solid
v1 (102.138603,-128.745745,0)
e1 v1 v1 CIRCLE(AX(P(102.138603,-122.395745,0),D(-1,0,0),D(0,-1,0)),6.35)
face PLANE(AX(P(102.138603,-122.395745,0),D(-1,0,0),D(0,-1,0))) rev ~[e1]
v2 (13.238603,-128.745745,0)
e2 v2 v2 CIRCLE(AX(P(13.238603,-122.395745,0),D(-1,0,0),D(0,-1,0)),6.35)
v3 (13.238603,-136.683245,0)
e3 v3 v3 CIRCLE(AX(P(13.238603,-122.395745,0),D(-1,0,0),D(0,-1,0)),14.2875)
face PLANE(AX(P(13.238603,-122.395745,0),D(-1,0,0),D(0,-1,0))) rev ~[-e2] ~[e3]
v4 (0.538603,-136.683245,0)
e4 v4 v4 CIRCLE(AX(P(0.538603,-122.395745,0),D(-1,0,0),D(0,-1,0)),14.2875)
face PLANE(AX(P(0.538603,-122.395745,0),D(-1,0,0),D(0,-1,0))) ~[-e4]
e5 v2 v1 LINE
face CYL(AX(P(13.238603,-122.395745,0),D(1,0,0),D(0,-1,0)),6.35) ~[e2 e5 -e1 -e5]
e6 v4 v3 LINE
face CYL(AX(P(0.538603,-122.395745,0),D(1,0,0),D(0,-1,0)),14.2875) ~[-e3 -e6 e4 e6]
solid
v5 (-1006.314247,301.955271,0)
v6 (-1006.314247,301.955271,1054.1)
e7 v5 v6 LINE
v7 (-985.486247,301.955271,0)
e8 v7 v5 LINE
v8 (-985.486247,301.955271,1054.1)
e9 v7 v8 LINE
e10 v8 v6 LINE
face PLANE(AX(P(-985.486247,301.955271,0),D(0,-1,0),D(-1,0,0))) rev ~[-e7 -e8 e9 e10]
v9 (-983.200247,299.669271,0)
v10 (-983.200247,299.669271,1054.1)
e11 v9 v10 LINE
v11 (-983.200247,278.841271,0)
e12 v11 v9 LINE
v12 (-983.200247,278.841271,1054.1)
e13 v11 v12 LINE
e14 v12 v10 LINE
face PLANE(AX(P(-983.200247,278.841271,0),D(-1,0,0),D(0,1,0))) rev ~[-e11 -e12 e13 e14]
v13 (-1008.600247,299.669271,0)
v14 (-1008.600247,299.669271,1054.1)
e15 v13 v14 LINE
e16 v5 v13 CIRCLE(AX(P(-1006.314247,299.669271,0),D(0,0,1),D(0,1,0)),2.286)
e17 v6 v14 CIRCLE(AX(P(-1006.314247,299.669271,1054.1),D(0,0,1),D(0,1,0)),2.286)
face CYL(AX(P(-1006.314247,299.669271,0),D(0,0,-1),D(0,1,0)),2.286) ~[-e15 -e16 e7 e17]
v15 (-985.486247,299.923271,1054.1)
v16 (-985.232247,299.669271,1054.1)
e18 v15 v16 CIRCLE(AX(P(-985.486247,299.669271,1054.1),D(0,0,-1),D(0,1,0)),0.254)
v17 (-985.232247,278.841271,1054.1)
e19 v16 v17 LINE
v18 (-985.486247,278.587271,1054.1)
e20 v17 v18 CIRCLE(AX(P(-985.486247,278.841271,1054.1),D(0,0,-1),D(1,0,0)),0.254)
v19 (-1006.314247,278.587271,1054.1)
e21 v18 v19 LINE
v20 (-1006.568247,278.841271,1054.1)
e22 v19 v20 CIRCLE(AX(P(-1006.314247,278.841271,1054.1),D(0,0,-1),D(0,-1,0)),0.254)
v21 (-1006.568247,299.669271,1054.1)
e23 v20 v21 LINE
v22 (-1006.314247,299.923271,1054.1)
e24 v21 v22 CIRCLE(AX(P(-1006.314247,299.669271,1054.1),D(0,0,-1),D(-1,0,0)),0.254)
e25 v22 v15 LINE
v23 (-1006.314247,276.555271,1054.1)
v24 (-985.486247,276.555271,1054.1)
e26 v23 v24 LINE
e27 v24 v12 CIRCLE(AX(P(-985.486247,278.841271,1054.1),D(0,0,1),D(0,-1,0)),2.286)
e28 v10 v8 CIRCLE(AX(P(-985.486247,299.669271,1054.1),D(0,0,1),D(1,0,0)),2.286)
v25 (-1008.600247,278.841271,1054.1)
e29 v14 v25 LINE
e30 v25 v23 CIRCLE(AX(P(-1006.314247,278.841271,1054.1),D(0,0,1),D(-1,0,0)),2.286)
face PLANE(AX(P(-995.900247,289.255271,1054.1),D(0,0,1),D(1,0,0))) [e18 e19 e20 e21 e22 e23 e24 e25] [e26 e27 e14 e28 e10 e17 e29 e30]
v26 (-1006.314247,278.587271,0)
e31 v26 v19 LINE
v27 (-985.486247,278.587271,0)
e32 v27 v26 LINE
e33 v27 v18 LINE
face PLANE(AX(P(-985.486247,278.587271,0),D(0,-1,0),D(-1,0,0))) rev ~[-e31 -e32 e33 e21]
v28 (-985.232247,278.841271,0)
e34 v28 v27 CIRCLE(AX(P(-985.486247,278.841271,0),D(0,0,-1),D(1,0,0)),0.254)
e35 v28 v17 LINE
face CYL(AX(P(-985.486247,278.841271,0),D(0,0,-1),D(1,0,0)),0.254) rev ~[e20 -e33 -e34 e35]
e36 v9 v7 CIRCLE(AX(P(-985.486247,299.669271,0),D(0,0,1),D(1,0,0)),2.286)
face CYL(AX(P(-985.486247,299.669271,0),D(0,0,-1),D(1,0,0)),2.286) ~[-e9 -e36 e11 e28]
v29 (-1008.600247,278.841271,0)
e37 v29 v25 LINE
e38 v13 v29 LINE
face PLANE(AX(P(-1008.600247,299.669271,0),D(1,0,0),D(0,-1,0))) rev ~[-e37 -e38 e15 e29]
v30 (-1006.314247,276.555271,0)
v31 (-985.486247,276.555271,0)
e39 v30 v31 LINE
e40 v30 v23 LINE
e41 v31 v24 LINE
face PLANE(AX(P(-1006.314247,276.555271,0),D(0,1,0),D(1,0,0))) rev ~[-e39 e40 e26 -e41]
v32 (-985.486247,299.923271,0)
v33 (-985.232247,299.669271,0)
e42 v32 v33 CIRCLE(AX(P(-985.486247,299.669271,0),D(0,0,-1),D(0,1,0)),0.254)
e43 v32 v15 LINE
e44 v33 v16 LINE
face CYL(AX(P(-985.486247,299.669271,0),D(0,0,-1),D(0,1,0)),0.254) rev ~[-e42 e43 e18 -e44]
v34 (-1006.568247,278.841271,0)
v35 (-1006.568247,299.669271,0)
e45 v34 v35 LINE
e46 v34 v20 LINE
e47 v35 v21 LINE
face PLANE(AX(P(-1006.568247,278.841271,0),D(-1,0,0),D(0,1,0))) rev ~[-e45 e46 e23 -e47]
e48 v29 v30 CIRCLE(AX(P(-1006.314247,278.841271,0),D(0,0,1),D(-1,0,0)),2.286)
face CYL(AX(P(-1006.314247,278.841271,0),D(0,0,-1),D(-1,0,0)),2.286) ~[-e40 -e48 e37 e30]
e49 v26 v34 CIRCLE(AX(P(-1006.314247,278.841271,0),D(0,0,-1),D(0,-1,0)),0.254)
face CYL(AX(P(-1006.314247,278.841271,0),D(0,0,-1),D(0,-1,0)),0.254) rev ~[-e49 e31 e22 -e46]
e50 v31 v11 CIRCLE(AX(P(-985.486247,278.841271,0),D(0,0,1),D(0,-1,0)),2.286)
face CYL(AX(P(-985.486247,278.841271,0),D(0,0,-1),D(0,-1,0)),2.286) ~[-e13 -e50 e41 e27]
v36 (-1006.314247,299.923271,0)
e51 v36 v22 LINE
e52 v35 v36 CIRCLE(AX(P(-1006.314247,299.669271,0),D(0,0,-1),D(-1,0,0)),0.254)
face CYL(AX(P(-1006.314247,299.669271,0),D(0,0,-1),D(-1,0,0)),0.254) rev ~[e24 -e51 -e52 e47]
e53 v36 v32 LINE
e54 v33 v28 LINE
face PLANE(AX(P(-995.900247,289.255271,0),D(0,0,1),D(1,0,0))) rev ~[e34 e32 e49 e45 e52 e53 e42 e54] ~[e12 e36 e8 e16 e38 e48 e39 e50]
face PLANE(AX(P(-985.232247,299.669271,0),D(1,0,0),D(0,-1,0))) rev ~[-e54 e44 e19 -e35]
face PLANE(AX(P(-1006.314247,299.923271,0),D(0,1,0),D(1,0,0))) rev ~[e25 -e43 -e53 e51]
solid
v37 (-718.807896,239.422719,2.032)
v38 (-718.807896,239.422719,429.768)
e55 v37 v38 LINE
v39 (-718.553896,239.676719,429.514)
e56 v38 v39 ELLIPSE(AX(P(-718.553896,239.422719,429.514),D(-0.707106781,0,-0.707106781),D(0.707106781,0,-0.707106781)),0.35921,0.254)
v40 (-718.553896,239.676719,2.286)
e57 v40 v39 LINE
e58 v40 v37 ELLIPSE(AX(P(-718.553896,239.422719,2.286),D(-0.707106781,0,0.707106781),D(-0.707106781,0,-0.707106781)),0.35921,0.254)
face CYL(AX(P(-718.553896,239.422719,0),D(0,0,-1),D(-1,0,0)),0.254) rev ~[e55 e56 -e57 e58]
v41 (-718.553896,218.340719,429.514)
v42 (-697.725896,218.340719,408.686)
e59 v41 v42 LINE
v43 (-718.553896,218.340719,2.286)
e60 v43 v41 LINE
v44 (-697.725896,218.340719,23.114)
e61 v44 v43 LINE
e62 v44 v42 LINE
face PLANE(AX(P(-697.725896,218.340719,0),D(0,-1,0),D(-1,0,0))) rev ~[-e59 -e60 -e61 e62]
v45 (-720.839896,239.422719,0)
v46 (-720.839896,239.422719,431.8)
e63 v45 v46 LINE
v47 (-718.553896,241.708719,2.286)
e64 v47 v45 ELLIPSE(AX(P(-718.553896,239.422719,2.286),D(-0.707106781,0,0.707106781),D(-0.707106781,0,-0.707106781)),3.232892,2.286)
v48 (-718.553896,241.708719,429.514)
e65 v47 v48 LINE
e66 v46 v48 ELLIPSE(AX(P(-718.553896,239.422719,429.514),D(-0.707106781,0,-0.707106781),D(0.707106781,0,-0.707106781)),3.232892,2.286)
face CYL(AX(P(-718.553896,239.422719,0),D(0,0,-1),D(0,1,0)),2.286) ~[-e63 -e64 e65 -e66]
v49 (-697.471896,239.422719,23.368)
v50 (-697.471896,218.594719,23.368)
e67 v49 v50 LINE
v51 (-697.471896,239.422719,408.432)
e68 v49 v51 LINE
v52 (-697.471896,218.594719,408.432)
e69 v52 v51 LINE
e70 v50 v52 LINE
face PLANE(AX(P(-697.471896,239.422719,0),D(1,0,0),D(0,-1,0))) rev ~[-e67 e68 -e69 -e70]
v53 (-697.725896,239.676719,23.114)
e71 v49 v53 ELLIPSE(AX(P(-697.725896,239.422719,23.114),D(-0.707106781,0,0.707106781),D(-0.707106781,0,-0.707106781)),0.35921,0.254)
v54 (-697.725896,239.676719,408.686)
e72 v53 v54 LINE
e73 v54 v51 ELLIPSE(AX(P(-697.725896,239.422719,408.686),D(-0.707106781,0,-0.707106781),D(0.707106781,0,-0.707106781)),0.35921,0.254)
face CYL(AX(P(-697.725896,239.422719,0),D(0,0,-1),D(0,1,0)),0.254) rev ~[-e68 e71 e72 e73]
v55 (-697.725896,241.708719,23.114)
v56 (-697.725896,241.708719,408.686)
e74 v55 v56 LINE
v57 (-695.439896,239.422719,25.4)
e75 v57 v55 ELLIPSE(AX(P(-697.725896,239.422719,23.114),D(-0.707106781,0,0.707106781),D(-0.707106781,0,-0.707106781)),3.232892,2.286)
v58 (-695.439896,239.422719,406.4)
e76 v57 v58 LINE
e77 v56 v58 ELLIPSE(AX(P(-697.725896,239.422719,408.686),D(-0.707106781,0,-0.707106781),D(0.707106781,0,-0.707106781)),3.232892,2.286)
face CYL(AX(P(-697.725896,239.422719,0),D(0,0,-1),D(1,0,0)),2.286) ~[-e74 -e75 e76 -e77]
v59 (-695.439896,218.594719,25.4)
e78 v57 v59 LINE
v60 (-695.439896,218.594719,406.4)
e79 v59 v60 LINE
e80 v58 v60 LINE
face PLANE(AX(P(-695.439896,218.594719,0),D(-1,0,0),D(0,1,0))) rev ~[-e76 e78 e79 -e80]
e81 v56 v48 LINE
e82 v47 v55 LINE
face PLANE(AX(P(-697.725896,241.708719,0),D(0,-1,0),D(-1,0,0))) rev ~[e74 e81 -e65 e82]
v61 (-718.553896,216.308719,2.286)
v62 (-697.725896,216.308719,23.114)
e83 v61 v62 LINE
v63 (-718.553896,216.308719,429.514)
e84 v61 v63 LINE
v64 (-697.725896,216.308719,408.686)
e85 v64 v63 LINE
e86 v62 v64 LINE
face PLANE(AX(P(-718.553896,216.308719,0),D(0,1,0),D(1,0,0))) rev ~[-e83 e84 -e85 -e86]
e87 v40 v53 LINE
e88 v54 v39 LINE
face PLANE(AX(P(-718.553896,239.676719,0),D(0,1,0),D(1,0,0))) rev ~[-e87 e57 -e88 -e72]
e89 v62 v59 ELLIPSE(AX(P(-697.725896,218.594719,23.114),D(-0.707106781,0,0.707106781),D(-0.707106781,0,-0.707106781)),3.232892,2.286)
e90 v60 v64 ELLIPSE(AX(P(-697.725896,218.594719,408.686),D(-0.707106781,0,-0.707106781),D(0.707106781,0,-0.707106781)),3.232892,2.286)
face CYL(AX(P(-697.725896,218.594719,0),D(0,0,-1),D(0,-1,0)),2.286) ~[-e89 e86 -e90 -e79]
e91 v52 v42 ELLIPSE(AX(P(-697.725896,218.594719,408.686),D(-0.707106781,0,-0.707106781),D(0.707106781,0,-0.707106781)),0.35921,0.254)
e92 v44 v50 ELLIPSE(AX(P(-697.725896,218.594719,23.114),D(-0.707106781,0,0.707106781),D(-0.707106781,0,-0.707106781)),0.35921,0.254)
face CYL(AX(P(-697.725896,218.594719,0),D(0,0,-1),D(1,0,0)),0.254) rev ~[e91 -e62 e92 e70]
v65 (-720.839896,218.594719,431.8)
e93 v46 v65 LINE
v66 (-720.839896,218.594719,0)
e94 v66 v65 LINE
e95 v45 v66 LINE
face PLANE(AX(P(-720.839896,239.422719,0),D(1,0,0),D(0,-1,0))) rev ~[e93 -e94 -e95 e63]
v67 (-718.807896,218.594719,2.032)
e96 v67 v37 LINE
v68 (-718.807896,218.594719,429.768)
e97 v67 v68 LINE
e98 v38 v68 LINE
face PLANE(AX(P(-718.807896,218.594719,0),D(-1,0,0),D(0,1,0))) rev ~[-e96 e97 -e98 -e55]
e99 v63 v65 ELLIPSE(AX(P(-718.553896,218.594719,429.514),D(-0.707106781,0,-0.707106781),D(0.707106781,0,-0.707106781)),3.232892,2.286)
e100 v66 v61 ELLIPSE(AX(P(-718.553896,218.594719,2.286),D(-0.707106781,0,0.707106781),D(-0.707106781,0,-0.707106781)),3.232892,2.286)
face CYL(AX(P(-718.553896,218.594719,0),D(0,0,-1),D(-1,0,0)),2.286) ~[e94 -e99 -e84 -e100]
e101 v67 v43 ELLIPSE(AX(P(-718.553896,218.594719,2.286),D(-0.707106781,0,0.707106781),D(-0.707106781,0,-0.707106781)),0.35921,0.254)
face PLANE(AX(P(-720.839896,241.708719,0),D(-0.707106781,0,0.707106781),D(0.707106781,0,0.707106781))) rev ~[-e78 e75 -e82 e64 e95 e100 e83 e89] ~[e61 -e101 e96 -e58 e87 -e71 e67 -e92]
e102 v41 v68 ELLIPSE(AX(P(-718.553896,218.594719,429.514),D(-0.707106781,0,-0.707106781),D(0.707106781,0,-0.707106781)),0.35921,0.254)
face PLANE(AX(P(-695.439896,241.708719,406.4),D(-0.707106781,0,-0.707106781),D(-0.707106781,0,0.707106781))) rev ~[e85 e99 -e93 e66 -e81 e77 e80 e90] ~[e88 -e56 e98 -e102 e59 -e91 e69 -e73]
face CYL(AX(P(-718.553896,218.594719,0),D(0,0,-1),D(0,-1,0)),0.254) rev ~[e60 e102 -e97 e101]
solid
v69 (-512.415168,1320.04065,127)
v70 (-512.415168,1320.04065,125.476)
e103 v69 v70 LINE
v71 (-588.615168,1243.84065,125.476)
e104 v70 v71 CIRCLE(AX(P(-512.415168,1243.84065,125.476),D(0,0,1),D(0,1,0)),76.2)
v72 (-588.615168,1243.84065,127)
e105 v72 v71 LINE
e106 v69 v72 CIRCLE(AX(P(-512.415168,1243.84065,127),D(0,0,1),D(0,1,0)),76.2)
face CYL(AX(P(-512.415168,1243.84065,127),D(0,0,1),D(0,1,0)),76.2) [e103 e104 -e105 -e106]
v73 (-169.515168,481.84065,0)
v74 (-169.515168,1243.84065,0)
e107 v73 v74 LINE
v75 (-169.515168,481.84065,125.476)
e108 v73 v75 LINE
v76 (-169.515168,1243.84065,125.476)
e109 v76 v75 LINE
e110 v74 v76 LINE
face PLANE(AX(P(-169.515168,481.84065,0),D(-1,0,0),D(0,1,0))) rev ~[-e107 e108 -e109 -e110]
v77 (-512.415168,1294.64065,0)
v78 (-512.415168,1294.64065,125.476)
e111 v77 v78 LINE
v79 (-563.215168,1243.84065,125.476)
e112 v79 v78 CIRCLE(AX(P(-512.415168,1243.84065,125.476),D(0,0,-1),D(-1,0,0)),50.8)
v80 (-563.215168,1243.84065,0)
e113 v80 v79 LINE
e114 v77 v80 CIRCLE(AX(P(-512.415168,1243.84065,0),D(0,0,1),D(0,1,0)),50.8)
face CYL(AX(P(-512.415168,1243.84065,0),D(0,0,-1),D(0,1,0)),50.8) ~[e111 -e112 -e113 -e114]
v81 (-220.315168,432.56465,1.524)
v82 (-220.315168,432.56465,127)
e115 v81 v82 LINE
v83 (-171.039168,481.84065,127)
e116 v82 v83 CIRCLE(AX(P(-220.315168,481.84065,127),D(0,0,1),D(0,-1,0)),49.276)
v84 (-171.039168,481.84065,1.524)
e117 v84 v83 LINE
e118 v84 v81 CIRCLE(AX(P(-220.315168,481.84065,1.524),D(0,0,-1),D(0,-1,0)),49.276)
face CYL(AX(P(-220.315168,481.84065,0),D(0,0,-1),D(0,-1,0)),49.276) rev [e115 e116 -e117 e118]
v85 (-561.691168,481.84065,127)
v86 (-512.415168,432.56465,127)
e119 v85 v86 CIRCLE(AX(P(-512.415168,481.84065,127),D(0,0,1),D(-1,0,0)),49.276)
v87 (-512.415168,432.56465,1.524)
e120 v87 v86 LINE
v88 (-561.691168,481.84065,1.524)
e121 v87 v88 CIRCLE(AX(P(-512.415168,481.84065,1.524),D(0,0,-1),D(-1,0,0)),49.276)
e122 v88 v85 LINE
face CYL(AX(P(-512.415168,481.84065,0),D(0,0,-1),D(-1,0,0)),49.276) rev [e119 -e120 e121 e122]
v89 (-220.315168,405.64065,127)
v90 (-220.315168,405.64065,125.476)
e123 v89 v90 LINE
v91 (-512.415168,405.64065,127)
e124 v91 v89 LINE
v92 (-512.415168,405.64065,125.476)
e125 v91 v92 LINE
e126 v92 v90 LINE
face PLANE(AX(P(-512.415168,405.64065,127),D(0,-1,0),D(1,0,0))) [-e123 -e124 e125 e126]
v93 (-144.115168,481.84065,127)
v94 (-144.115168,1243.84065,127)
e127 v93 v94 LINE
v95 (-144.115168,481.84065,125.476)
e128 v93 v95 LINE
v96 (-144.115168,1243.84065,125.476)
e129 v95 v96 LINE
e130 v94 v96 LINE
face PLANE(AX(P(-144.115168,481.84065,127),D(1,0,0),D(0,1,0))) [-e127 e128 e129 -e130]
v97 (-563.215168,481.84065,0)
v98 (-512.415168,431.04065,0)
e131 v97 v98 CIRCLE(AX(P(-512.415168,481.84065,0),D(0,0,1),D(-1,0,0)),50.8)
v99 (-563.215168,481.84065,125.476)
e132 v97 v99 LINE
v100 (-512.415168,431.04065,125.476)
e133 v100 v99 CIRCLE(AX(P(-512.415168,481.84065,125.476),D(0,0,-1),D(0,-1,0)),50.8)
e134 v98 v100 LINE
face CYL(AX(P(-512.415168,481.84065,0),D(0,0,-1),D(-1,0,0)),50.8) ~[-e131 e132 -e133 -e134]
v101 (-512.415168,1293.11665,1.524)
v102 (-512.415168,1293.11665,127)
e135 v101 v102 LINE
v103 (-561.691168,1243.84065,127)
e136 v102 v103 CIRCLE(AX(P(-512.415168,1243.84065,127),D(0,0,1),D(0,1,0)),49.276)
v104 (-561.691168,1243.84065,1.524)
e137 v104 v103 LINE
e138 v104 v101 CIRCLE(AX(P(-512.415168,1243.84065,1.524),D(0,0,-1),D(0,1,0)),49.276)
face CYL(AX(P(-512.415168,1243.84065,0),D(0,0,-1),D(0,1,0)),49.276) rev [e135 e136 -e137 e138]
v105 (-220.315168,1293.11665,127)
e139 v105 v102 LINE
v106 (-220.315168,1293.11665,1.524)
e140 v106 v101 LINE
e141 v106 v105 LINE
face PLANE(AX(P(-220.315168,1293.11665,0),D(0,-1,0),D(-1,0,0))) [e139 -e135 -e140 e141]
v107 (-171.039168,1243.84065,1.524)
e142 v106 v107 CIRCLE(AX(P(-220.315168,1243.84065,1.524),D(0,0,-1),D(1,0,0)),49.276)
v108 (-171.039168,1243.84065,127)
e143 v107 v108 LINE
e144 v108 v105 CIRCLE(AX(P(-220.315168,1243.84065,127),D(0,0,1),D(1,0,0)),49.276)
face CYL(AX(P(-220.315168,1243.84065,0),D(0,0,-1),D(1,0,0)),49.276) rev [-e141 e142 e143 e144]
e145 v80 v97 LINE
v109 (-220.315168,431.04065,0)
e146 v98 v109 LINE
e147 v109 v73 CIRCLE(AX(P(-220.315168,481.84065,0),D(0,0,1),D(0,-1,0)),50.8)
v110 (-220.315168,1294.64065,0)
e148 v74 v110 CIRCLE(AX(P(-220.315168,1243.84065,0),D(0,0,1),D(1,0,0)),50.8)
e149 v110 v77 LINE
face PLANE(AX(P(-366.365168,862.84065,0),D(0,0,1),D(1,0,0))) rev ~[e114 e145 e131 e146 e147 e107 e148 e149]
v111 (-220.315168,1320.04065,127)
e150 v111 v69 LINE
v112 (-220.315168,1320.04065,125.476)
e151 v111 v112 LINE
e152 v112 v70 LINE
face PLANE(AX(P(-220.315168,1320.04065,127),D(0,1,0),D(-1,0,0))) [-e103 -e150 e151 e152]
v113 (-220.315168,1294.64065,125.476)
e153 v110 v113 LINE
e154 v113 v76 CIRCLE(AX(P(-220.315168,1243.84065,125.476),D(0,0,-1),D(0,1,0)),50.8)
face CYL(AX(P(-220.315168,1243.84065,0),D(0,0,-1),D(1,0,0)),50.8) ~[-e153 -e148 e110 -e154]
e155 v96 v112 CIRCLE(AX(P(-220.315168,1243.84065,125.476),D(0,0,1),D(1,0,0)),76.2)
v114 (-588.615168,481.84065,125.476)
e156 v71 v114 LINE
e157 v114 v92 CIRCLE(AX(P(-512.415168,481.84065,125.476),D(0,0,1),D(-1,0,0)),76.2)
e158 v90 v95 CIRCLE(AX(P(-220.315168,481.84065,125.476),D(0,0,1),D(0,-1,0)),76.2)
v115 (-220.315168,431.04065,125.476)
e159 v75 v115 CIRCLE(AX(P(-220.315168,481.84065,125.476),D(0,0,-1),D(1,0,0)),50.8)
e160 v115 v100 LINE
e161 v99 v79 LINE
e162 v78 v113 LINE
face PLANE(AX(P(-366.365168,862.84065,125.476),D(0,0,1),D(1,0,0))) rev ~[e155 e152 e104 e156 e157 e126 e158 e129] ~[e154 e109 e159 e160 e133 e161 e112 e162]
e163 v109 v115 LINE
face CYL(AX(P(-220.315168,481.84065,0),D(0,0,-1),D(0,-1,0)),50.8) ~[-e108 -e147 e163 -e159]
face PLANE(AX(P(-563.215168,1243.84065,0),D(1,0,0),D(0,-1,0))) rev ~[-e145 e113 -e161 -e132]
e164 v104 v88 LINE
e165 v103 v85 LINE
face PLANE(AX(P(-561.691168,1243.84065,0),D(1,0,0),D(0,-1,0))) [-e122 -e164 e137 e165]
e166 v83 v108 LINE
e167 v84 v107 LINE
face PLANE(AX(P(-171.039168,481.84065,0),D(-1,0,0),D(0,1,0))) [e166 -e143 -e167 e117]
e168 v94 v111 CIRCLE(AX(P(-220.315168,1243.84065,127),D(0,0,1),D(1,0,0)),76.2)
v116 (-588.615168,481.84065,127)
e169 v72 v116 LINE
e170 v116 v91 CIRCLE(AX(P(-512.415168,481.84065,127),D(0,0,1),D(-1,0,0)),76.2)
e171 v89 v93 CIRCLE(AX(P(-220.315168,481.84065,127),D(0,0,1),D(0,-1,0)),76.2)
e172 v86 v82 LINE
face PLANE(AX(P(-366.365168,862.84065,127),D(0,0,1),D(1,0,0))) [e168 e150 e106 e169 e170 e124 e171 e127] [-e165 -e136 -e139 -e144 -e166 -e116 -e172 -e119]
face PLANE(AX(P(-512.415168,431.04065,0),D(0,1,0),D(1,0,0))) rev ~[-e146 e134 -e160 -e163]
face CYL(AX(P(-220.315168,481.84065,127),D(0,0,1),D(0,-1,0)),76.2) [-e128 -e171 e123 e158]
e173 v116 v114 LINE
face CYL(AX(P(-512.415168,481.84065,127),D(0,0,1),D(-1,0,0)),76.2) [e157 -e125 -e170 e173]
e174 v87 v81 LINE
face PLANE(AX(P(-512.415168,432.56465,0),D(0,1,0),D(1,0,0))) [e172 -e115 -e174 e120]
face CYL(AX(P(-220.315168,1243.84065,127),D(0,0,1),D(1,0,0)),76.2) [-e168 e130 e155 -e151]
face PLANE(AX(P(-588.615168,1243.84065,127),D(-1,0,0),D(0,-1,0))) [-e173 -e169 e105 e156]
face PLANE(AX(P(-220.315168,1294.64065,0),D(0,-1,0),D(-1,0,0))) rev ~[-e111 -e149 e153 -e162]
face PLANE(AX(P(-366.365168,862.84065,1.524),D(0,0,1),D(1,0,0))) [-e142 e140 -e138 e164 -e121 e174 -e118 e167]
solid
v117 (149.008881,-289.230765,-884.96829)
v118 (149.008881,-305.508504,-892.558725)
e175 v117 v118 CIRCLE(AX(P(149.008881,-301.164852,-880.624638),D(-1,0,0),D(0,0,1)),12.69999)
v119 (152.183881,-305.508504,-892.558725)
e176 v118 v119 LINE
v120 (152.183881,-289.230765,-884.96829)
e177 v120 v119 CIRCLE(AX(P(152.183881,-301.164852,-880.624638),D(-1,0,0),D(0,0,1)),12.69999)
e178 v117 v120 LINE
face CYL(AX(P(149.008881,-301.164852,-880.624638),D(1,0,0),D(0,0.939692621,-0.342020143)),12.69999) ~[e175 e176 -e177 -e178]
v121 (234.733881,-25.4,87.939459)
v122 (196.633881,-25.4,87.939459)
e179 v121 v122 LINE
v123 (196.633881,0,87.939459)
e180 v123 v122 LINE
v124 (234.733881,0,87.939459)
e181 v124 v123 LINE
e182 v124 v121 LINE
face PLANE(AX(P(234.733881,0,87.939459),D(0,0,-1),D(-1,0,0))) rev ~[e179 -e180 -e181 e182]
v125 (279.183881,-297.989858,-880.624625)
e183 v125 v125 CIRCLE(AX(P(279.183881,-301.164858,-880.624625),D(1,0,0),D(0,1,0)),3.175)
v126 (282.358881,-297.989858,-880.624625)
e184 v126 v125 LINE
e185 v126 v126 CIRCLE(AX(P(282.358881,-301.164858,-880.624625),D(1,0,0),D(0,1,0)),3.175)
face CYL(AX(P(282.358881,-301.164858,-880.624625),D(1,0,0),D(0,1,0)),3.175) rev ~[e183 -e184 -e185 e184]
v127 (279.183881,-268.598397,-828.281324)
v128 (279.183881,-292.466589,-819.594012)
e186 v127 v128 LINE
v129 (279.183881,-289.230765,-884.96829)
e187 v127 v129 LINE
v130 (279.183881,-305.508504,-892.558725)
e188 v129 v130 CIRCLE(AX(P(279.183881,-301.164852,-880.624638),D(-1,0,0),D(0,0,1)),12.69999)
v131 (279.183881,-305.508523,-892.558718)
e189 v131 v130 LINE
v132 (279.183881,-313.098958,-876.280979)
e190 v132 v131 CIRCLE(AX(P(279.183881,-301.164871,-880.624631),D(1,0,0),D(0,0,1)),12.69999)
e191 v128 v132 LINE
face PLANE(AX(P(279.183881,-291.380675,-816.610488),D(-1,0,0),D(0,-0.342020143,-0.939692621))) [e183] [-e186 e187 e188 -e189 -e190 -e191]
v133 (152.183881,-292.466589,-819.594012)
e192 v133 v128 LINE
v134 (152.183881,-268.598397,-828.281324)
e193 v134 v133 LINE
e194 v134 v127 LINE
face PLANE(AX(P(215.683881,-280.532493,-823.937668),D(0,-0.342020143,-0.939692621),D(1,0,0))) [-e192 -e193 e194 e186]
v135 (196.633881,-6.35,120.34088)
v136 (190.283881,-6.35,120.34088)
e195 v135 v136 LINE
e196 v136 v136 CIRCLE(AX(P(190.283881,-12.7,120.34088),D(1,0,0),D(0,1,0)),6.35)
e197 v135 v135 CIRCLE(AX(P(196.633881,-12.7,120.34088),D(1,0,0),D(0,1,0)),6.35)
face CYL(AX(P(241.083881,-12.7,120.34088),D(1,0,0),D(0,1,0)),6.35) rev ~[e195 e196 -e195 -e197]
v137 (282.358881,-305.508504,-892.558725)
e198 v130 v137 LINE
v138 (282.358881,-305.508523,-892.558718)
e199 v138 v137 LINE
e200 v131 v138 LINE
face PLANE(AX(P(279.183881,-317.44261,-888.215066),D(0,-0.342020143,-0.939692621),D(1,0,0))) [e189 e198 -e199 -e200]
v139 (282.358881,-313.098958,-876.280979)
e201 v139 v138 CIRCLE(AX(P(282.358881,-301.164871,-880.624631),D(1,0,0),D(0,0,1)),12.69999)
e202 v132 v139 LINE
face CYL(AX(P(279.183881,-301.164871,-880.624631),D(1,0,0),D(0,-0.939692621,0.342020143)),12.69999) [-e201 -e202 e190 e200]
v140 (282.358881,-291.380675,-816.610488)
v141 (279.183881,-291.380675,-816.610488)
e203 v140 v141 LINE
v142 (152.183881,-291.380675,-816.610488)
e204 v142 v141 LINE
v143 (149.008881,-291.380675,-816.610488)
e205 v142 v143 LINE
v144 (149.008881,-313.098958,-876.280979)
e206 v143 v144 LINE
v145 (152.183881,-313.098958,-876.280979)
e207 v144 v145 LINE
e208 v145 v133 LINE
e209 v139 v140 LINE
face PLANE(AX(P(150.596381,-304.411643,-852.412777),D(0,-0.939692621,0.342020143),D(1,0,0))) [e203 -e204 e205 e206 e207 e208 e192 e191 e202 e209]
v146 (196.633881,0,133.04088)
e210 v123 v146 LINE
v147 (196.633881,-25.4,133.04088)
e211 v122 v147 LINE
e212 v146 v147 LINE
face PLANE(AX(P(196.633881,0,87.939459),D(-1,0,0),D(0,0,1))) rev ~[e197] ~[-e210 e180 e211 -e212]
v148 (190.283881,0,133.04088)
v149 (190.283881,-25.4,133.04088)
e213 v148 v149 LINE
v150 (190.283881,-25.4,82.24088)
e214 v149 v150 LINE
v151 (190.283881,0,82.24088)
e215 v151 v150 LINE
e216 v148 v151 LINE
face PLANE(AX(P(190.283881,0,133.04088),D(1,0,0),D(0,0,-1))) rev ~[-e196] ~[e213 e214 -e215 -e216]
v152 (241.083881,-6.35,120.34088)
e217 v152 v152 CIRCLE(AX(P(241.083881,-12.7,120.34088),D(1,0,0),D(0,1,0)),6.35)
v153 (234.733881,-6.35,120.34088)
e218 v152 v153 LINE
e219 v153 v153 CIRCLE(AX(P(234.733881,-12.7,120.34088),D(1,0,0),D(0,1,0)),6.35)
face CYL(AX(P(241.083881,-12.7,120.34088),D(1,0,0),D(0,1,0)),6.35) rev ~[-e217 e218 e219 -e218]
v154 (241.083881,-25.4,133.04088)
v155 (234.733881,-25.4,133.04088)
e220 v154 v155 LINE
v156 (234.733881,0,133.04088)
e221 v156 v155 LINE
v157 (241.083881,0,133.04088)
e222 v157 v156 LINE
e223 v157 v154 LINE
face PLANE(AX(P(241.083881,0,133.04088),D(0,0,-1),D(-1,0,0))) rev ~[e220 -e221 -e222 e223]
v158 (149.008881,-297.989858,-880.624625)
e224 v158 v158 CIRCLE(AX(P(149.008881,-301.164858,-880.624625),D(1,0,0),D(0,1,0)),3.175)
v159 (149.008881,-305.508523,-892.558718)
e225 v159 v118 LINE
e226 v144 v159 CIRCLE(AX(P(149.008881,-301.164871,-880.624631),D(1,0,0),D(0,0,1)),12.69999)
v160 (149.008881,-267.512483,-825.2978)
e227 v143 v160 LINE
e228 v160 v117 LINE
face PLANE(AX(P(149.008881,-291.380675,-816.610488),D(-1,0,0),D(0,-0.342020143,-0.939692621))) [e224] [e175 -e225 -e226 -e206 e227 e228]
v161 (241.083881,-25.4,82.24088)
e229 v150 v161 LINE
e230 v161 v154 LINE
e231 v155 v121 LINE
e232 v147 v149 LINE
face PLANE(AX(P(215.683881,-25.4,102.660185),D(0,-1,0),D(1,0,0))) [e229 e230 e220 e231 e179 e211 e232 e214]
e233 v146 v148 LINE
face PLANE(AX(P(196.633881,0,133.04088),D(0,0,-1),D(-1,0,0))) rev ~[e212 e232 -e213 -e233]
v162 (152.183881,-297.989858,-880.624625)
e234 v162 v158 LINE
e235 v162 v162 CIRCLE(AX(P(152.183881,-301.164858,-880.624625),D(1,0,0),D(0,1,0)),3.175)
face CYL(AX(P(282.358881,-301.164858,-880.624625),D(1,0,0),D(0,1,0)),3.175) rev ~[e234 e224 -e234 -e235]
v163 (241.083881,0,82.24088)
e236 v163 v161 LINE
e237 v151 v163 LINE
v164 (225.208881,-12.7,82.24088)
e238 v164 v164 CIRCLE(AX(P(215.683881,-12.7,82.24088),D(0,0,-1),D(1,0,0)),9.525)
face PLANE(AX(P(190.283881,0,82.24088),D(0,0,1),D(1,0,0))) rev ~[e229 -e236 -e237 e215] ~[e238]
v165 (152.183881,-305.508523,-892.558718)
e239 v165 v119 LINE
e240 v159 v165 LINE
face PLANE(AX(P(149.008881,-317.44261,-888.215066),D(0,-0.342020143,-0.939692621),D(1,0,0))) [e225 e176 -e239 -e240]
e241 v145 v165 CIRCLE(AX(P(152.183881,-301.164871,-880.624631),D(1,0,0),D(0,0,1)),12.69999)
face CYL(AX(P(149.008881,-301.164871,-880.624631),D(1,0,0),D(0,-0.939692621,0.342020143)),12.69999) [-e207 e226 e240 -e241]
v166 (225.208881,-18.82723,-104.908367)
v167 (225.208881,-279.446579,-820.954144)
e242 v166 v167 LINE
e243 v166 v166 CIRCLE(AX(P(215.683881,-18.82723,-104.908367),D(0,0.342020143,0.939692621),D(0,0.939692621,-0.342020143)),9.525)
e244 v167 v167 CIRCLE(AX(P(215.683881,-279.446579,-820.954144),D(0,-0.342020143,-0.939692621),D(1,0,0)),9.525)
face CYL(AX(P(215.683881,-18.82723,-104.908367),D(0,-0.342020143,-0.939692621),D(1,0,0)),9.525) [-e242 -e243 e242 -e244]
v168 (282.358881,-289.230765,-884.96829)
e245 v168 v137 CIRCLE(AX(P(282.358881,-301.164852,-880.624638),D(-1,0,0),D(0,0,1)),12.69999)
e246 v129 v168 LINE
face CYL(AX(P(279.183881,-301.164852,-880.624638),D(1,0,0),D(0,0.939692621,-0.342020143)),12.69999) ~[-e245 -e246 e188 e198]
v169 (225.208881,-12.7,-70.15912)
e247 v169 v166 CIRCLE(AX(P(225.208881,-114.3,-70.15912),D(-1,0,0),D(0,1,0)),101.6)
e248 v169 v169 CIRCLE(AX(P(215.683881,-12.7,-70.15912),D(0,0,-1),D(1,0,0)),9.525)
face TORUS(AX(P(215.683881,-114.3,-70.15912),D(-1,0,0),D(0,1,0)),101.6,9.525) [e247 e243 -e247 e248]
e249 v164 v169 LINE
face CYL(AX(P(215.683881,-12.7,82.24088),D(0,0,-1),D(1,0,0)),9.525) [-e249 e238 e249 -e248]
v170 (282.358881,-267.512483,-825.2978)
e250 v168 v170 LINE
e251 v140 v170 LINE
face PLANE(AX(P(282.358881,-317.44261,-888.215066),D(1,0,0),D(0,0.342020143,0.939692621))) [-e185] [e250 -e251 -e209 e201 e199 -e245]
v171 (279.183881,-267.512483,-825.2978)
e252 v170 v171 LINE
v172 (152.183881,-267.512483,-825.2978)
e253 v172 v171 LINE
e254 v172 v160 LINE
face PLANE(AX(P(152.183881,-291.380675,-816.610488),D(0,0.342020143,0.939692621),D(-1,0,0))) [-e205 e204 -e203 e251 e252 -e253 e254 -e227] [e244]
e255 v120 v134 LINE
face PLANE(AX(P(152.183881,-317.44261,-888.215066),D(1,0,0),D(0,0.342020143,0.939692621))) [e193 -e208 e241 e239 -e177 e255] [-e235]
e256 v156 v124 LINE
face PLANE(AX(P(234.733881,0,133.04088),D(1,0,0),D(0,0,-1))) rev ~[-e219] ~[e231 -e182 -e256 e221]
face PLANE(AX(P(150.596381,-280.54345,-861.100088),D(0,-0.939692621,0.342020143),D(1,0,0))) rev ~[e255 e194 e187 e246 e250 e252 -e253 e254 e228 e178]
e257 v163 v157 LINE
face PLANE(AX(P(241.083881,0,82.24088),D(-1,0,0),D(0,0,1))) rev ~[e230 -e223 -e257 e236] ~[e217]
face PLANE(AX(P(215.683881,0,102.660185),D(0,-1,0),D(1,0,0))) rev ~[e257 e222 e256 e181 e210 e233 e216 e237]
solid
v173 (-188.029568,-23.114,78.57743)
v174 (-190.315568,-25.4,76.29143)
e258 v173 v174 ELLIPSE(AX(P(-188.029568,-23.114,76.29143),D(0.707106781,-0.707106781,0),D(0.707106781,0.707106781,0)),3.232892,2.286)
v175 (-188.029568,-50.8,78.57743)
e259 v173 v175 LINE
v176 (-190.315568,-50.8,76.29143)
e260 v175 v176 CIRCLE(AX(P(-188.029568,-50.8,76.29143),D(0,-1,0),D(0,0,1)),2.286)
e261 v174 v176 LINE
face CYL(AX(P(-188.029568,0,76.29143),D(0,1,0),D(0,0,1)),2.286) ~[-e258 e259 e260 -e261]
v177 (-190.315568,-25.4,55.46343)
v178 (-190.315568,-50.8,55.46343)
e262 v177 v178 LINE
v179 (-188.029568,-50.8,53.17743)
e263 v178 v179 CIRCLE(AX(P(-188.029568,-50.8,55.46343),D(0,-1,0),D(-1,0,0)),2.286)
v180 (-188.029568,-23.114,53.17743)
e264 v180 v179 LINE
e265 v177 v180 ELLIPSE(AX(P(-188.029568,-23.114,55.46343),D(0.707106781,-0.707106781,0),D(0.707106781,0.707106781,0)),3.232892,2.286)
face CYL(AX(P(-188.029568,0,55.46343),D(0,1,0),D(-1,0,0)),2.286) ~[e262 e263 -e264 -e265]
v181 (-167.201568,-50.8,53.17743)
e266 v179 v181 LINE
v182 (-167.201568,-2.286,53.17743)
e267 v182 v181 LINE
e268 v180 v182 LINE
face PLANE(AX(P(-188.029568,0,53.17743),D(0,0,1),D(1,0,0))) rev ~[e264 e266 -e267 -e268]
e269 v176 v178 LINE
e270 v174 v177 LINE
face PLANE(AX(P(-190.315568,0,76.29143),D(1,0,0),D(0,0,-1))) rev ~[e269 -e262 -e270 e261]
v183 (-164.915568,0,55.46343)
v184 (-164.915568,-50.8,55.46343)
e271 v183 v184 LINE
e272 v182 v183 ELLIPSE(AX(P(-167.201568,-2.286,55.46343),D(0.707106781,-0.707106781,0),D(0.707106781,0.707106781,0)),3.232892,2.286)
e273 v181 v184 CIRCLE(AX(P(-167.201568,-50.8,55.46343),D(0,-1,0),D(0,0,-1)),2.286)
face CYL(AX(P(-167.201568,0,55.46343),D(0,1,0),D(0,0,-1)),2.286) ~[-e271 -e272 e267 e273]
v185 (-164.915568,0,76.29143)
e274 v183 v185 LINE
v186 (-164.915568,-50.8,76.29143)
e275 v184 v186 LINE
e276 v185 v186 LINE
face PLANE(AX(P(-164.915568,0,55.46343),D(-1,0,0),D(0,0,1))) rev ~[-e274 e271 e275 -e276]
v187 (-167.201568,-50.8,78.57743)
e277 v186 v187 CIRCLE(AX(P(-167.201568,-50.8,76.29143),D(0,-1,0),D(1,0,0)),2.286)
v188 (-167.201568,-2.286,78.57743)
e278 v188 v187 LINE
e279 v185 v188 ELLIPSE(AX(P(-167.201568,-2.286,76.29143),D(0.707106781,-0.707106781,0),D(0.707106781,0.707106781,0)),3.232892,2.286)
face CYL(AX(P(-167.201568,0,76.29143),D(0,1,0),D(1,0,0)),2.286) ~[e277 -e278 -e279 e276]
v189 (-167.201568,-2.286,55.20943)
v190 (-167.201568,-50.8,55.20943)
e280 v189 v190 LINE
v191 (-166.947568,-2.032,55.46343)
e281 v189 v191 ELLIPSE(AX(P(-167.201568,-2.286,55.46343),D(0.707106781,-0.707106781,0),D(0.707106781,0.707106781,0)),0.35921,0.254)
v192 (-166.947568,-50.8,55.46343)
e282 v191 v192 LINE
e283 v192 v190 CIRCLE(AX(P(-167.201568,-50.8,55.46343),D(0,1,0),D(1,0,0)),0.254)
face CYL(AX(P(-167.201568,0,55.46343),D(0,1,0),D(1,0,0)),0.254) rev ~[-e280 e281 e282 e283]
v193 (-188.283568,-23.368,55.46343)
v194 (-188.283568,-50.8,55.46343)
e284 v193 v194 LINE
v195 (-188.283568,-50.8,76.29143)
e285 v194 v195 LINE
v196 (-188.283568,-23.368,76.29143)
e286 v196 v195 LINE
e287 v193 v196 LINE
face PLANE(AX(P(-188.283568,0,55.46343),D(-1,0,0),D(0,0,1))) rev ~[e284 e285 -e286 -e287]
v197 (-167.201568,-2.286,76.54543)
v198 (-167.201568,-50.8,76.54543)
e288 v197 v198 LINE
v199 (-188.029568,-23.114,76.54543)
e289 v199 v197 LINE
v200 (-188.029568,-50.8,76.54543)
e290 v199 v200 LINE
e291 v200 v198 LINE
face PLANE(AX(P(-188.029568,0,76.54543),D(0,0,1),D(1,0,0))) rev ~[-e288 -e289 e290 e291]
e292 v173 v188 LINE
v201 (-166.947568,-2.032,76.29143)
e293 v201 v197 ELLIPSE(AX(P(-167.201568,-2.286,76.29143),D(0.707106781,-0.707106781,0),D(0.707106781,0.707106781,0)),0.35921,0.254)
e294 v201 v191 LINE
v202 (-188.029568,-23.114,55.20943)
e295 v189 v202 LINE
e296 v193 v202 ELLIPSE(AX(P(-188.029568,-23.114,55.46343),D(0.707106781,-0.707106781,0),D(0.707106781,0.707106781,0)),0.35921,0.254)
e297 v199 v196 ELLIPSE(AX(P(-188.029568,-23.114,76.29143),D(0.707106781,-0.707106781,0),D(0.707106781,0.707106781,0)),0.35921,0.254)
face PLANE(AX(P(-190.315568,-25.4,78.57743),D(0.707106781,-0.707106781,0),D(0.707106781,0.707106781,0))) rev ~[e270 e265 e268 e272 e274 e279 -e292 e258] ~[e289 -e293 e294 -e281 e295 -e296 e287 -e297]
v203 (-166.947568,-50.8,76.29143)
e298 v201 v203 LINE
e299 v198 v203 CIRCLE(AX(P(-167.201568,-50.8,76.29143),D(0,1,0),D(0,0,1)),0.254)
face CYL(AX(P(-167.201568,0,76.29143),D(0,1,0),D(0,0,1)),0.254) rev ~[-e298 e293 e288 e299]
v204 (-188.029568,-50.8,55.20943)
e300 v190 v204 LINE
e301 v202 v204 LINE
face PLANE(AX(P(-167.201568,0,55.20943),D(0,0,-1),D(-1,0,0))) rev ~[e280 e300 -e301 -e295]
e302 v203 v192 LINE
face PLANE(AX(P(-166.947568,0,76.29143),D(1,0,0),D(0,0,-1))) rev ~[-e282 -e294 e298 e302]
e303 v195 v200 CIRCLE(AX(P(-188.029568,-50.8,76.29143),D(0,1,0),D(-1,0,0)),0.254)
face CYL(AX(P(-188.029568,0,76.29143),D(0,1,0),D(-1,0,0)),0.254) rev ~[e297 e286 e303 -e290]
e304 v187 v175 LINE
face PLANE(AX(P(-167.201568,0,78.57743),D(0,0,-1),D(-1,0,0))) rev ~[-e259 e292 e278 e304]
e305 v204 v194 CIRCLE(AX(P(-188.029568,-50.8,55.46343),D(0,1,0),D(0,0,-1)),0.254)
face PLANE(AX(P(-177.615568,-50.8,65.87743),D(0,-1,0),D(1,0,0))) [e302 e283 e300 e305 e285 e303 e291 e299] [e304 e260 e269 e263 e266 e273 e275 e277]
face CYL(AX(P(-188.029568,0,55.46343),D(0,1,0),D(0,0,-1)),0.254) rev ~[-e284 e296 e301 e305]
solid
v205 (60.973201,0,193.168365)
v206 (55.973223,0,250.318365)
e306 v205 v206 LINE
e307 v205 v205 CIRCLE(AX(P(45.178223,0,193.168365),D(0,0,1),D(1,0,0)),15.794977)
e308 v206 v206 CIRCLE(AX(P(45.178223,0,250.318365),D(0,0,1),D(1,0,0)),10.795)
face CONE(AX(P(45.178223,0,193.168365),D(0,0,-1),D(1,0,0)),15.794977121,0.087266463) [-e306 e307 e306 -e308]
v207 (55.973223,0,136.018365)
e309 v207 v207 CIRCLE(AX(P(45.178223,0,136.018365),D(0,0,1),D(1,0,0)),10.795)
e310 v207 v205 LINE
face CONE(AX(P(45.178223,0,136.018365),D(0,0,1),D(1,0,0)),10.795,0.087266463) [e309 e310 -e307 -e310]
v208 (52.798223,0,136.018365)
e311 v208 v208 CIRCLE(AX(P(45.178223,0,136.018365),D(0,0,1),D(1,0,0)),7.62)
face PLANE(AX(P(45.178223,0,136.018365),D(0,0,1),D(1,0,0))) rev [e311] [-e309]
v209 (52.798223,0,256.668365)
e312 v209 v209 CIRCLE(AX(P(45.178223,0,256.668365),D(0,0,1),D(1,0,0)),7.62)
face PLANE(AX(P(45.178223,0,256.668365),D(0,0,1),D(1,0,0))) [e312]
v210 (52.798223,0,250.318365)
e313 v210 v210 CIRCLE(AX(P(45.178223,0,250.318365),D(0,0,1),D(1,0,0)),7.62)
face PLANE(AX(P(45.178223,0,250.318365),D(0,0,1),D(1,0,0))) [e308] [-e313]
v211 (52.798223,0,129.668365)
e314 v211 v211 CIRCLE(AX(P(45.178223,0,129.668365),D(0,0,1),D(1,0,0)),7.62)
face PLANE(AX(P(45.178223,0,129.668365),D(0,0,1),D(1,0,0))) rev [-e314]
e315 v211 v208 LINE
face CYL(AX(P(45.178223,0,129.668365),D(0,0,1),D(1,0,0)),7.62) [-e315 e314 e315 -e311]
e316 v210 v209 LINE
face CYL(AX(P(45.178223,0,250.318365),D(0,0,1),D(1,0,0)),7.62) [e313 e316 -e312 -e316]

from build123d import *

# Parameters (mm, degrees)
F1_DEPTH  = 1054.1
F3_DEPTH  = 431.8
F5_DEPTH  = 50.8
F7_DEPTH  = 25.4
F9_DEPTH  = 25.4
F13_DEPTH = 127
F14_T     = -1.524
F16_DEPTH = 1.524
F18_DEPTH = 25.4
F19_R     = 9.525
F23_R     = 6.35
F24_DEPTH = 50.8
F25_W     = 127
F25_H     = 25.4
F25_R     = 9.525
F26_DEPTH = 3.175
F28_DEPTH = 25.4
F29_R     = 3.175
F30_DEPTH = 133.35
F31_R     = 12.69999


# Not quite as in the source:
# - a fillet or chamfer is up to 0.001 mm smaller than in the source, because OpenCascade refuses the exact size


with BuildPart() as f1:
    # F0 (on Top) → F1 (new body)
    with BuildSketch(Plane.XY):
        with BuildLine():
            ThreePointArc((-1008.6002467976, 278.8412709408), (-1007.9306928994, 277.224824839), (-1006.3142467976, 276.5552709408))
            Line((-1006.3142467976, 276.5552709408), (-985.4862467976, 276.5552709408))
            ThreePointArc((-985.4862467976, 276.5552709408), (-983.8698006958, 277.224824839), (-983.2002467976, 278.8412709408))
            Line((-983.2002467976, 278.8412709408), (-983.2002467976, 299.6692709408))
            ThreePointArc((-983.2002467976, 299.6692709408), (-983.8698006958, 301.2857170426), (-985.4862467976, 301.9552709408))
            Line((-985.4862467976, 301.9552709408), (-1006.3142467976, 301.9552709408))
            ThreePointArc((-1006.3142467976, 301.9552709408), (-1007.9306928994, 301.2857170426), (-1008.6002467976, 299.6692709408))
            Line((-1008.6002467976, 299.6692709408), (-1008.6002467976, 278.8412709408))
        make_face()
        with BuildLine():
            ThreePointArc((-1006.5682467976, 299.6692709408), (-1006.49385192, 299.8488760632), (-1006.3142467976, 299.9232709408))
            Line((-1006.3142467976, 299.9232709408), (-985.4862467976, 299.9232709408))
            ThreePointArc((-985.4862467976, 299.9232709408), (-985.3066416751, 299.8488760632), (-985.2322467976, 299.6692709408))
            Line((-985.2322467976, 299.6692709408), (-985.2322467976, 278.8412709408))
            ThreePointArc((-985.2322467976, 278.8412709408), (-985.3066416751, 278.6616658184), (-985.4862467976, 278.5872709408))
            Line((-985.4862467976, 278.5872709408), (-1006.3142467976, 278.5872709408))
            ThreePointArc((-1006.3142467976, 278.5872709408), (-1006.49385192, 278.6616658184), (-1006.5682467976, 278.8412709408))
            Line((-1006.5682467976, 278.8412709408), (-1006.5682467976, 299.6692709408))
        make_face(mode=Mode.SUBTRACT)
    extrude(amount=F1_DEPTH)


with BuildPart() as f3:
    # F2 (on Top) → F3 (new body)
    with BuildSketch(Plane.XY):
        with BuildLine():
            ThreePointArc((-720.8398963928, 218.5947193251), (-720.1703424946, 216.9782732233), (-718.5538963928, 216.3087193251))
            Line((-718.5538963928, 216.3087193251), (-697.7258963928, 216.3087193251))
            ThreePointArc((-697.7258963928, 216.3087193251), (-696.109450291, 216.9782732233), (-695.4398963928, 218.5947193251))
            Line((-695.4398963928, 218.5947193251), (-695.4398963928, 239.4227193251))
            ThreePointArc((-695.4398963928, 239.4227193251), (-696.109450291, 241.0391654269), (-697.7258963928, 241.7087193251))
            Line((-697.7258963928, 241.7087193251), (-718.5538963928, 241.7087193251))
            ThreePointArc((-718.5538963928, 241.7087193251), (-720.1703424946, 241.0391654269), (-720.8398963928, 239.4227193251))
            Line((-720.8398963928, 239.4227193251), (-720.8398963928, 218.5947193251))
        make_face()
        with BuildLine():
            ThreePointArc((-718.8078963928, 239.4227193251), (-718.7335015152, 239.6023244475), (-718.5538963928, 239.6767193251))
            Line((-718.5538963928, 239.6767193251), (-697.7258963928, 239.6767193251))
            ThreePointArc((-697.7258963928, 239.6767193251), (-697.5462912704, 239.6023244475), (-697.4718963928, 239.4227193251))
            Line((-697.4718963928, 239.4227193251), (-697.4718963928, 218.5947193251))
            ThreePointArc((-697.4718963928, 218.5947193251), (-697.5462912704, 218.4151142026), (-697.7258963928, 218.3407193251))
            Line((-697.7258963928, 218.3407193251), (-718.5538963928, 218.3407193251))
            ThreePointArc((-718.5538963928, 218.3407193251), (-718.7335015152, 218.4151142026), (-718.8078963928, 218.5947193251))
            Line((-718.8078963928, 218.5947193251), (-718.8078963928, 239.4227193251))
        make_face(mode=Mode.SUBTRACT)
    extrude(amount=F3_DEPTH)

    # F8 (on face) → F9 (cut, through all)
    with BuildSketch(Plane(origin=(0, 241.7087193251, 0), x_dir=(-1, 0, 0), z_dir=(0, 1, 0))):
        Polygon((695.4398963928, 431.8), (695.4398963928, 406.4), (697.7258963928, 408.686), (697.7258963928, 431.8), align=None)
        Polygon((697.7258963928, 431.8), (697.7258963928, 408.686), (718.5538963928, 429.514), (718.5538963928, 431.8), align=None)
        Polygon((718.5538963928, 431.8), (718.5538963928, 429.514), (720.8398963928, 431.8), align=None)
        Polygon((718.5538963928, 2.286), (697.7258963928, 23.114), (697.7258963928, 0), (718.5538963928, 0), align=None)
        Polygon((720.8398963928, 0), (718.5538963928, 2.286), (718.5538963928, 0), align=None)
        Polygon((697.7258963928, 0), (697.7258963928, 23.114), (695.4398963928, 25.4), (695.4398963928, 0), align=None)
    extrude(amount=-F9_DEPTH, mode=Mode.SUBTRACT)


with BuildPart() as f5:
    # F4 (on Front) → F5 (new body)
    with BuildSketch(Plane.XZ):
        with BuildLine():
            ThreePointArc((-190.3155680418, 55.463430141), (-189.6460141436, 53.8469840392), (-188.0295680418, 53.177430141))
            Line((-188.0295680418, 53.177430141), (-167.2015680418, 53.177430141))
            ThreePointArc((-167.2015680418, 53.177430141), (-165.58512194, 53.8469840392), (-164.9155680418, 55.463430141))
            Line((-164.9155680418, 55.463430141), (-164.9155680418, 76.291430141))
            ThreePointArc((-164.9155680418, 76.291430141), (-165.58512194, 77.9078762428), (-167.2015680418, 78.577430141))
            Line((-167.2015680418, 78.577430141), (-188.0295680418, 78.577430141))
            ThreePointArc((-188.0295680418, 78.577430141), (-189.6460141436, 77.9078762428), (-190.3155680418, 76.291430141))
            Line((-190.3155680418, 76.291430141), (-190.3155680418, 55.463430141))
        make_face()
        with BuildLine():
            ThreePointArc((-188.2835680418, 76.291430141), (-188.2091731642, 76.4710352634), (-188.0295680418, 76.545430141))
            Line((-188.0295680418, 76.545430141), (-167.2015680418, 76.545430141))
            ThreePointArc((-167.2015680418, 76.545430141), (-167.0219629194, 76.4710352634), (-166.9475680418, 76.291430141))
            Line((-166.9475680418, 76.291430141), (-166.9475680418, 55.463430141))
            ThreePointArc((-166.9475680418, 55.463430141), (-167.0219629194, 55.2838250186), (-167.2015680418, 55.209430141))
            Line((-167.2015680418, 55.209430141), (-188.0295680418, 55.209430141))
            ThreePointArc((-188.0295680418, 55.209430141), (-188.2091731642, 55.2838250186), (-188.2835680418, 55.463430141))
            Line((-188.2835680418, 55.463430141), (-188.2835680418, 76.291430141))
        make_face(mode=Mode.SUBTRACT)
    extrude(amount=F5_DEPTH)

    # F6 (on face) → F7 (cut, through all)
    with BuildSketch(Plane.XY.offset(78.577430141)):
        Polygon((-188.0295680418, 0), (-190.3155680418, 0), (-190.3155680418, -25.4), (-188.0295680418, -23.114), align=None)
        Polygon((-167.2015680418, 0), (-188.0295680418, 0), (-188.0295680418, -23.114), (-167.2015680418, -2.286), align=None)
        Polygon((-164.9155680418, 0), (-167.2015680418, 0), (-167.2015680418, -2.286), align=None)
    extrude(amount=-F7_DEPTH, mode=Mode.SUBTRACT)


with BuildPart() as f11:
    # F10 (on Top) → F11 (revolve)
    with BuildSketch(Plane.XY):
        Polygon((102.1386031211, -128.7457447313), (102.1386031211, -122.3957447313), (0.5386031211, -122.3957447313), (0.5386031211, -136.6832447313), (13.2386031211, -136.6832447313), (13.2386031211, -128.7457447313), align=None)
    revolve(axis=Axis((51.3386031211, -122.3957447313, 0), (-1, 0, 0)))


with BuildPart() as f13:
    # F12 (on Top) → F13 (new body)
    with BuildSketch(Plane.XY):
        with BuildLine():
            Line((-220.3151675584, 1294.6406504526), (-512.4151675584, 1294.6406504526))
            ThreePointArc((-512.4151675584, 1294.6406504526), (-548.3361920427, 1279.7616749369), (-563.2151675584, 1243.8406504526))
            Line((-563.2151675584, 1243.8406504526), (-563.2151675584, 481.8406504526))
            ThreePointArc((-563.2151675584, 481.8406504526), (-548.3361920427, 445.9196259683), (-512.4151675584, 431.0406504526))
            Line((-512.4151675584, 431.0406504526), (-220.3151675584, 431.0406504526))
            ThreePointArc((-220.3151675584, 431.0406504526), (-184.3941430741, 445.9196259683), (-169.5151675584, 481.8406504526))
            Line((-169.5151675584, 481.8406504526), (-169.5151675584, 1243.8406504526))
            ThreePointArc((-169.5151675584, 1243.8406504526), (-184.3941430741, 1279.7616749369), (-220.3151675584, 1294.6406504526))
        make_face()
    extrude(amount=F13_DEPTH)

    # F14
    f14_openings = [f13.faces().sort_by_distance(p)[0] for p in [
        (-366.365168, 862.84065, 127),
    ]]
    offset(amount=F14_T, openings=f14_openings)

    # F15 (on face) → F16 (join)
    with BuildSketch(Plane.XY.offset(127)):
        with BuildLine():
            Line((-220.3151675584, 1320.0406504526), (-512.4151675584, 1320.0406504526))
            ThreePointArc((-512.4151675584, 1320.0406504526), (-566.2967042848, 1297.722187179), (-588.6151675584, 1243.8406504526))
            Line((-588.6151675584, 1243.8406504526), (-588.6151675584, 481.8406504526))
            ThreePointArc((-588.6151675584, 481.8406504526), (-566.2967042848, 427.9591137262), (-512.4151675584, 405.6406504526))
            Line((-512.4151675584, 405.6406504526), (-220.3151675584, 405.6406504526))
            ThreePointArc((-220.3151675584, 405.6406504526), (-166.433630832, 427.9591137262), (-144.1151675584, 481.8406504526))
            Line((-144.1151675584, 481.8406504526), (-144.1151675584, 1243.8406504526))
            ThreePointArc((-144.1151675584, 1243.8406504526), (-166.433630832, 1297.722187179), (-220.3151675584, 1320.0406504526))
        make_face()
        with BuildLine():
            Line((-563.2151675584, 481.8406504526), (-563.2151675584, 1243.8406504526))
            ThreePointArc((-563.2151675584, 1243.8406504526), (-548.3361920427, 1279.7616749369), (-512.4151675584, 1294.6406504526))
            Line((-512.4151675584, 1294.6406504526), (-220.3151675584, 1294.6406504526))
            ThreePointArc((-220.3151675584, 1294.6406504526), (-184.3941430741, 1279.7616749369), (-169.5151675584, 1243.8406504526))
            Line((-169.5151675584, 1243.8406504526), (-169.5151675584, 481.8406504526))
            ThreePointArc((-169.5151675584, 481.8406504526), (-184.3941430741, 445.9196259683), (-220.3151675584, 431.0406504526))
            Line((-220.3151675584, 431.0406504526), (-512.4151675584, 431.0406504526))
            ThreePointArc((-512.4151675584, 431.0406504526), (-548.3361920427, 445.9196259683), (-563.2151675584, 481.8406504526))
        make_face(mode=Mode.SUBTRACT)
    extrude(amount=-F16_DEPTH)


with BuildPart() as f18:
    # F17 (on Front) → F18 (new body)
    with BuildSketch(Plane.XZ):
        Polygon((196.633880581, 133.0408798925), (190.283880581, 133.0408798925), (190.283880581, 82.2408798925), (241.083880581, 82.2408798925), (241.083880581, 133.0408798925), (234.733880581, 133.0408798925), (234.733880581, 87.9394591683), (196.633880581, 87.9394591683), align=None)
    extrude(amount=F18_DEPTH)

    # F22: sweep along a path in F21
    with BuildLine(Plane.YZ.offset(215.683880581)) as f22_path:
        Line((-12.7, 82.2408798925), (-12.7, -70.1591201075))
        ThreePointArc((-12.7, -70.1591201075), (-14.243532294, -87.8017749585), (-18.8272297282, -104.9083666694))
        Line((-18.8272297282, -104.9083666694), (-279.4465789423, -820.9541437083))
    # F19 (on face) → F22 (sweep)
    with BuildSketch(Plane(origin=(0, 0, 82.2408798925), x_dir=(1, 0, 0), z_dir=(0, 0, -1))):
        with Locations((215.683880581, 12.7)):
            Circle(F19_R)
    sweep(path=f22_path.line)

    # F23 (on face) → F24 (cut, through all)
    with BuildSketch(Plane.YZ.offset(241.083880581)):
        with Locations((-12.7, 120.3408798925)):
            Circle(F23_R)
    extrude(amount=-F24_DEPTH, mode=Mode.SUBTRACT)

    # F25 (on face) → F26 (join)
    with BuildSketch(Plane(origin=(0, -296.5386158457, -814.7331510325), x_dir=(1, 0, 0), z_dir=(0, -0.3420201433, -0.9396926208))):
        with Locations((215.683880581, -18.188965759)):
            Rectangle(F25_W, F25_H)
        with Locations((215.683880581, -18.188965759)):
            Circle(F25_R, mode=Mode.SUBTRACT)
        with Locations((215.683880581, -18.188965759)):
            Circle(F25_R)
    extrude(amount=F26_DEPTH)

    # F27 (on face) → F28 (join, through all)
    with BuildSketch(Plane(origin=(0, 5.1579406194, -1.8773368556), x_dir=(1, 0, 0), z_dir=(0, -0.9396926208, 0.3420201433))):
        Polygon((152.183880581, -870.195909828), (152.183880581, -867.020909828), (149.008880581, -867.020909828), (149.008880581, -943.220909828), (152.183880581, -943.220909828), align=None)
        Polygon((282.358880581, -867.020909828), (279.183880581, -867.020909828), (279.183880581, -870.195909828), (279.183880581, -943.220909828), (282.358880581, -943.220909828), align=None)
    extrude(amount=-F28_DEPTH)

    # F29 (on face) → F30 (cut, through all)
    with BuildSketch(Plane.YZ.offset(282.358880581)):
        with Locations((-301.1648580435, -880.6246251282)):
            Circle(F29_R)
    extrude(amount=-F30_DEPTH, mode=Mode.SUBTRACT)

    # F31 (radius 12.7 in the source; OpenCascade refuses exactly that, so slightly less here)
    f31_edges = [f18.edges().sort_by_distance(p)[0] for p in [
        (280.771381, -293.574418, -896.902377),
        (280.771381, -317.44261, -888.215066),
        (150.596381, -293.574418, -896.902377),
        (150.596381, -317.44261, -888.215066),
    ]]
    fillet(f31_edges, radius=F31_R)


with BuildPart() as f33:
    # F32 (on Front) → F33 (revolve)
    with BuildSketch(Plane.XZ):
        Polygon((60.973200519, 193.168364866), (55.9732233985, 250.318364866), (52.7982233985, 250.318364866), (52.7982233985, 256.668364866), (45.1782233985, 256.668364866), (45.1782233985, 129.668364866), (52.7982233985, 129.668364866), (52.7982233985, 136.018364866), (55.9732233985, 136.018364866), align=None)
    revolve(axis=Axis((45.1782233985, 0, 193.168364866), (0, 0, 1)))


solid = Compound([f1.part, f3.part, f5.part, f11.part, f13.part, f18.part, f33.part])
